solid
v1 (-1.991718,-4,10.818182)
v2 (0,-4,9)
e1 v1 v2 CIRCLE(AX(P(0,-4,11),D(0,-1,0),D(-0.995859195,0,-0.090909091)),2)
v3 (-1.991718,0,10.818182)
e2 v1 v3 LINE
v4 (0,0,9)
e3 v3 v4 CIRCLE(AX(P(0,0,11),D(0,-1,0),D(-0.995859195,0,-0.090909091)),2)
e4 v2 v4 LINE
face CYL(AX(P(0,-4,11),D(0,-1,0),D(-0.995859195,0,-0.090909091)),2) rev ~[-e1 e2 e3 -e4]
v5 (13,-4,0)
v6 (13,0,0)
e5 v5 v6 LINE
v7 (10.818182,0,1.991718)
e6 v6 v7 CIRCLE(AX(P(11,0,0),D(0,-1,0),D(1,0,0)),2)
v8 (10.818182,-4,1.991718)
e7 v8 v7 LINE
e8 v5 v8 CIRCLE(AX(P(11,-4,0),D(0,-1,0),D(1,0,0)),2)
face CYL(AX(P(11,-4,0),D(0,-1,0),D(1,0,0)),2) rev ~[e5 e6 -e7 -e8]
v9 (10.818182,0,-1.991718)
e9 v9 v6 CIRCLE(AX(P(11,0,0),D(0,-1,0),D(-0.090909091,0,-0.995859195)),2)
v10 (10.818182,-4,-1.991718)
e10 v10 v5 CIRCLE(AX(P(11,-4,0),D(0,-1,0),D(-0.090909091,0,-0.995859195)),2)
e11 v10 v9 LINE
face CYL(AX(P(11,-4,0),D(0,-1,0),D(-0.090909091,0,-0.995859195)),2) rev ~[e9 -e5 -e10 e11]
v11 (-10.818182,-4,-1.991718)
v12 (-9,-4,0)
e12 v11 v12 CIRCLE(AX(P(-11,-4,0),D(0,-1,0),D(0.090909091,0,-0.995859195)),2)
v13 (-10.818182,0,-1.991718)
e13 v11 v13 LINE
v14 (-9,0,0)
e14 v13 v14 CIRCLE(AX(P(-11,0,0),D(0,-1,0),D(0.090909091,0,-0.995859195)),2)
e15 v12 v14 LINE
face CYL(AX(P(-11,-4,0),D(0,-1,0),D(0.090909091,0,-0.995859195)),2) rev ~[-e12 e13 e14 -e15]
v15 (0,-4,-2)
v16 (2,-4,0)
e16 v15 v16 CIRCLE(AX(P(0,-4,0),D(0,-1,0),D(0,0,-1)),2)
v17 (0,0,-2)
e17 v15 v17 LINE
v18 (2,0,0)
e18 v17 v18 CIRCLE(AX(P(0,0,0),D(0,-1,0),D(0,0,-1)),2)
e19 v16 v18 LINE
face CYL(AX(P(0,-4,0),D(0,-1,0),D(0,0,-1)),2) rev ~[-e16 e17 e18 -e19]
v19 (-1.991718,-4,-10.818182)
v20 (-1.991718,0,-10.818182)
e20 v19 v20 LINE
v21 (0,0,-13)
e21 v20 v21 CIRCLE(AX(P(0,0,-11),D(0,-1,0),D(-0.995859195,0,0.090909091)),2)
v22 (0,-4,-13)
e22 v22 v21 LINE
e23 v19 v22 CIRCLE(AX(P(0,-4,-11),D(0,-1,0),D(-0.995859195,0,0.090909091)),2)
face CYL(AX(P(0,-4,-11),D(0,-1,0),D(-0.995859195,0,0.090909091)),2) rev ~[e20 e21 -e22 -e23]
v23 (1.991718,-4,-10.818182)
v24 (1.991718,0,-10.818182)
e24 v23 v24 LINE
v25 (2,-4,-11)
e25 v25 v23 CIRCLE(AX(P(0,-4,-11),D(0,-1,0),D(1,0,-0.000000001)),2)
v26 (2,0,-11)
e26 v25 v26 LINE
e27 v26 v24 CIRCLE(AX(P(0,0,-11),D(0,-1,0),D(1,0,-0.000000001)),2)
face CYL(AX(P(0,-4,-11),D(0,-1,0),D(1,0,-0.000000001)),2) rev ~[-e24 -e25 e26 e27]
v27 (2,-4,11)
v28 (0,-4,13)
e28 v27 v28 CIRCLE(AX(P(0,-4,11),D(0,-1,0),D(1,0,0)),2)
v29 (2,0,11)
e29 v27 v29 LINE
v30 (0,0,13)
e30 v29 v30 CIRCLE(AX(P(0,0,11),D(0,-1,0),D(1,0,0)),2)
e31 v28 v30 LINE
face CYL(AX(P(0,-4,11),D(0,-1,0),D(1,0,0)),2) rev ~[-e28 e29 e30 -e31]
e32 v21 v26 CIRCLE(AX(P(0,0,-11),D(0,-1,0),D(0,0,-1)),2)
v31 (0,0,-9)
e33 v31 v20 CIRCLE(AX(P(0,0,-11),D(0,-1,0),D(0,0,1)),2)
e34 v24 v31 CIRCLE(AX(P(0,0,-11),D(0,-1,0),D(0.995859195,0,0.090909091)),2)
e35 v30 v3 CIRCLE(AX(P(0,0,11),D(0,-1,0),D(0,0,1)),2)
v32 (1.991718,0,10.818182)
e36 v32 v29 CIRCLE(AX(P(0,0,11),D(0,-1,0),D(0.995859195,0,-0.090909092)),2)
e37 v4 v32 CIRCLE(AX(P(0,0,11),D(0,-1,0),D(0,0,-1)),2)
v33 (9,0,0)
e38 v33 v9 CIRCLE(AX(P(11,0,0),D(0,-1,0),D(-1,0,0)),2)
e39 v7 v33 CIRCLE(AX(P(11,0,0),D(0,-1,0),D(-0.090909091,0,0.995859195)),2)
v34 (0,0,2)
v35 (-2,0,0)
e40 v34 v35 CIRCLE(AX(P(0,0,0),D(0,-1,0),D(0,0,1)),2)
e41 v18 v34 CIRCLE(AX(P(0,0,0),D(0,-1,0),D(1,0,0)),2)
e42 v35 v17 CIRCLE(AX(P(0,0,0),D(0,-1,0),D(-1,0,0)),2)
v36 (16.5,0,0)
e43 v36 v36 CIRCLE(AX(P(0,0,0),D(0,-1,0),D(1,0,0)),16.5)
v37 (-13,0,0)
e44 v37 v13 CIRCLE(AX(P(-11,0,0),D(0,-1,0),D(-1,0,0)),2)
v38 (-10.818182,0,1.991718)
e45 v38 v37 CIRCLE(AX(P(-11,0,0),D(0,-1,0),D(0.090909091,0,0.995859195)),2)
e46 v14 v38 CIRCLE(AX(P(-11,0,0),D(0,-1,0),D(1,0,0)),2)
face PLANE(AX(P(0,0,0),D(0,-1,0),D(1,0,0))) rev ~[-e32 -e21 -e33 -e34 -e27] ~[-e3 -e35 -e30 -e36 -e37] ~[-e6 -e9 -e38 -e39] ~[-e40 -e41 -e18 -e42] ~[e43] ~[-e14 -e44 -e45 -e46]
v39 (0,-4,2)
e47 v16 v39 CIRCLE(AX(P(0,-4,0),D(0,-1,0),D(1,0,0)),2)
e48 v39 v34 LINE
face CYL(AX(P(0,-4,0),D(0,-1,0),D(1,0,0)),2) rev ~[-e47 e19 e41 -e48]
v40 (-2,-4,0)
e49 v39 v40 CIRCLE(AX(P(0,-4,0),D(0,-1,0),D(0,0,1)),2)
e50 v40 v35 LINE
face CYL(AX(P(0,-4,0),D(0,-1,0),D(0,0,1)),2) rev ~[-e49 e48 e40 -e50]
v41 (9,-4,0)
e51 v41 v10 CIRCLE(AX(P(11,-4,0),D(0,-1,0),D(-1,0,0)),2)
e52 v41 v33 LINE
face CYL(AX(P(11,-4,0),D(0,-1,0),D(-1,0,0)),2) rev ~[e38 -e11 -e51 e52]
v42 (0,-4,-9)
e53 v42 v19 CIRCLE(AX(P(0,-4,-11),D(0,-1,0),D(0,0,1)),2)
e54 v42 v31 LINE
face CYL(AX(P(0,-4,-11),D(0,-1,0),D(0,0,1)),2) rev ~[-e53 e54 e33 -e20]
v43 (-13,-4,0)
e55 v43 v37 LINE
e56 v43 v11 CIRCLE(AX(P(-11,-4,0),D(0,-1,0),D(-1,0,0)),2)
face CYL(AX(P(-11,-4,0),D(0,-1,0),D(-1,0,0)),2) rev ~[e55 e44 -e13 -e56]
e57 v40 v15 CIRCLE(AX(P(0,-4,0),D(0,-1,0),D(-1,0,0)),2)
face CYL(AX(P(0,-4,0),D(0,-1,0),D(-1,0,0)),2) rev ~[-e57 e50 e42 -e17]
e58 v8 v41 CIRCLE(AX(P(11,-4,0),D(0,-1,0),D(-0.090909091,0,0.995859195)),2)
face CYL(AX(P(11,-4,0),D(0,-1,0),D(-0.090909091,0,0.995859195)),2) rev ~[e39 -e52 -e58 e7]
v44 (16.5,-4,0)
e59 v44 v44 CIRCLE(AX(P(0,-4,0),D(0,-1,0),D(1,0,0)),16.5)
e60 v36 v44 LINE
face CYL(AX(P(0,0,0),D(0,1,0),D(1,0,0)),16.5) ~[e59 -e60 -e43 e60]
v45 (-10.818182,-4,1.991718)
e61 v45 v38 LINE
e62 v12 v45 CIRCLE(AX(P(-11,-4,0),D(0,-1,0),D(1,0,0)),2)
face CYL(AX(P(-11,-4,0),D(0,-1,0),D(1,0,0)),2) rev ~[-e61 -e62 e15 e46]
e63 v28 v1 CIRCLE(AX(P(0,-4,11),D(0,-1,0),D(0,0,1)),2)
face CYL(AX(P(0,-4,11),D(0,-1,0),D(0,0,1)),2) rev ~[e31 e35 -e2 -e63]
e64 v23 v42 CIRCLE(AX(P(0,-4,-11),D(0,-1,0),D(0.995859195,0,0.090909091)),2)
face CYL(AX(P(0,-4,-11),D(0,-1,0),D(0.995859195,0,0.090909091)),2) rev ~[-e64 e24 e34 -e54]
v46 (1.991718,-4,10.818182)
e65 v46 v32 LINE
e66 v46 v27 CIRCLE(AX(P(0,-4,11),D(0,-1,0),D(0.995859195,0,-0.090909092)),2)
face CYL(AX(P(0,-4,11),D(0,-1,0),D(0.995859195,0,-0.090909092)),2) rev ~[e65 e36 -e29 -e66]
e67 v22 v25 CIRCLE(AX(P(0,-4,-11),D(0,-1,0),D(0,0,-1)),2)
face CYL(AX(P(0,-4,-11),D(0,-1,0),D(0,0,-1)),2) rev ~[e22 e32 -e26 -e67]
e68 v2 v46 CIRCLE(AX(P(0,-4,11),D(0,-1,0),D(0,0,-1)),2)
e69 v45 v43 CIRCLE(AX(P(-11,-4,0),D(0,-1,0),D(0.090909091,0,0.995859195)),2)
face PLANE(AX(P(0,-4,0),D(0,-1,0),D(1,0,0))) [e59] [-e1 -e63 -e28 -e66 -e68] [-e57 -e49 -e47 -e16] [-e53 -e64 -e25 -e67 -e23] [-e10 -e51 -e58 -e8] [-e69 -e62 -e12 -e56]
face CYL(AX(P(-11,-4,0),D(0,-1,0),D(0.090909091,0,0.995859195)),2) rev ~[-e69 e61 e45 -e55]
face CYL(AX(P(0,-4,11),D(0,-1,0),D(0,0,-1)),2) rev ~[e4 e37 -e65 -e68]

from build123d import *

# Parameters (mm, degrees)
F0_R     = 16.5
F1_DEPTH = 4
F3_DEPTH = 4.001


with BuildPart() as f1:
    # F0 (on Front) → F1 (new body)
    with BuildSketch(Plane.XZ):
        Circle(F0_R)
    extrude(amount=F1_DEPTH)

    # F2 (on face) → F3 (cut, through all)
    with BuildSketch(Plane.XZ.offset(4)):
        with BuildLine():
            ThreePointArc((-10.8181818182, -1.9917183909), (-9.5229021082, -1.3483997249), (-9, 0))
            Line((-9, 0), (-9.5, 0))
            Line((-9.5, 0), (-11, 0))
            ThreePointArc((-11, 0), (-10.9544511501, -1), (-10.8181818182, -1.9917183909))
        make_face()
        with BuildLine():
            Line((-9.5, 0), (-9, 0))
            ThreePointArc((-9, 0), (-9.5229021082, 1.3483997249), (-10.8181818182, 1.9917183909))
            ThreePointArc((-10.8181818182, 1.9917183909), (-10.9544511501, 1), (-11, 0))
            Line((-11, 0), (-9.5, 0))
        make_face()
        with BuildLine():
            ThreePointArc((0, 2), (-1.4142135624, 1.4142135624), (-2, 0))
            Line((-2, 0), (0, 0))
            Line((0, 0), (0, 2))
        make_face()
        with BuildLine():
            Line((0, 0), (-2, 0))
            ThreePointArc((-2, 0), (-1.4142135624, -1.4142135624), (0, -2))
            Line((0, -2), (0, 0))
        make_face()
        with BuildLine():
            ThreePointArc((-11, 0), (-10.9544511501, 1), (-10.8181818182, 1.9917183909))
            ThreePointArc((-10.8181818182, 1.9917183909), (-12.3483997249, 1.4770978918), (-13, 0))
            Line((-13, 0), (-11, 0))
        make_face()
        with BuildLine():
            ThreePointArc((-13, 0), (-12.3483997249, -1.4770978918), (-10.8181818182, -1.9917183909))
            ThreePointArc((-10.8181818182, -1.9917183909), (-10.9544511501, -1), (-11, 0))
            Line((-11, 0), (-13, 0))
        make_face()
        with BuildLine():
            Line((2, 0), (0, 0))
            Line((0, 0), (0, -2))
            ThreePointArc((0, -2), (1.4142135624, -1.4142135624), (2, 0))
        make_face()
        with BuildLine():
            Line((0, 2), (0, 0))
            Line((0, 0), (2, 0))
            ThreePointArc((2, 0), (1.4142135624, 1.4142135624), (0, 2))
        make_face()
        with BuildLine():
            ThreePointArc((0, 13), (-1.4770978918, 12.3483997249), (-1.9917183909, 10.8181818182))
            ThreePointArc((-1.9917183909, 10.8181818182), (-1, 10.9544511501), (0, 11))
            Line((0, 11), (0, 13))
        make_face()
        with BuildLine():
            ThreePointArc((0, 11), (-1, 10.9544511501), (-1.9917183909, 10.8181818182))
            ThreePointArc((-1.9917183909, 10.8181818182), (-1.3483997249, 9.5229021082), (0, 9))
            Line((0, 9), (0, 9.5))
            Line((0, 9.5), (0, 11))
        make_face()
        with BuildLine():
            ThreePointArc((0, -9), (-1.3483997249, -9.5229021082), (-1.9917183909, -10.8181818182))
            ThreePointArc((-1.9917183909, -10.8181818182), (-1, -10.9544511501), (0, -11))
            Line((0, -11), (0, -9.5))
            Line((0, -9.5), (0, -9))
        make_face()
        with BuildLine():
            ThreePointArc((0, -11), (-1, -10.9544511501), (-1.9917183909, -10.8181818182))
            ThreePointArc((-1.9917183909, -10.8181818182), (-1.4770978918, -12.3483997249), (0, -13))
            Line((0, -13), (0, -11))
        make_face()
        with BuildLine():
            Line((0, 9.5), (0, 9))
            ThreePointArc((0, 9), (1.3483997249, 9.5229021082), (1.9917183909, 10.8181818182))
            ThreePointArc((1.9917183909, 10.8181818182), (1, 10.9544511501), (0, 11))
            Line((0, 11), (0, 9.5))
        make_face()
        with BuildLine():
            ThreePointArc((1.9917183909, -10.8181818182), (1.3483997249, -9.5229021082), (0, -9))
            Line((0, -9), (0, -9.5))
            Line((0, -9.5), (0, -11))
            ThreePointArc((0, -11), (1, -10.9544511501), (1.9917183909, -10.8181818182))
        make_face()
        with BuildLine():
            Line((0, 13), (0, 11))
            ThreePointArc((0, 11), (1, 10.9544511501), (1.9917183909, 10.8181818182))
            ThreePointArc((1.9917183909, 10.8181818182), (1.997928525, 10.9089966535), (2, 11))
            ThreePointArc((2, 11), (1.4142135624, 12.4142135624), (0, 13))
        make_face()
        with BuildLine():
            ThreePointArc((1.9917183909, -10.8181818182), (1, -10.9544511501), (0, -11))
            Line((0, -11), (0, -13))
            ThreePointArc((0, -13), (1.4142135624, -12.4142135624), (2, -11))
            ThreePointArc((2, -11), (1.997928525, -10.9089966535), (1.9917183909, -10.8181818182))
        make_face()
        with BuildLine():
            ThreePointArc((10.8181818182, 1.9917183909), (9.5229021082, 1.3483997249), (9, 0))
            Line((9, 0), (9.5, 0))
            Line((9.5, 0), (11, 0))
            ThreePointArc((11, 0), (10.9544511501, 1), (10.8181818182, 1.9917183909))
        make_face()
        with BuildLine():
            Line((9.5, 0), (9, 0))
            ThreePointArc((9, 0), (9.5229021082, -1.3483997249), (10.8181818182, -1.9917183909))
            ThreePointArc((10.8181818182, -1.9917183909), (10.9544511501, -1), (11, 0))
            Line((11, 0), (9.5, 0))
        make_face()
        with BuildLine():
            ThreePointArc((13, 0), (12.3483997249, 1.4770978918), (10.8181818182, 1.9917183909))
            ThreePointArc((10.8181818182, 1.9917183909), (10.9544511501, 1), (11, 0))
            Line((11, 0), (13, 0))
        make_face()
        with BuildLine():
            ThreePointArc((11, 0), (10.9544511501, -1), (10.8181818182, -1.9917183909))
            ThreePointArc((10.8181818182, -1.9917183909), (12.3483997249, -1.4770978918), (13, 0))
            Line((13, 0), (11, 0))
        make_face()
    extrude(amount=-F3_DEPTH, mode=Mode.SUBTRACT)


solid = f1.part
